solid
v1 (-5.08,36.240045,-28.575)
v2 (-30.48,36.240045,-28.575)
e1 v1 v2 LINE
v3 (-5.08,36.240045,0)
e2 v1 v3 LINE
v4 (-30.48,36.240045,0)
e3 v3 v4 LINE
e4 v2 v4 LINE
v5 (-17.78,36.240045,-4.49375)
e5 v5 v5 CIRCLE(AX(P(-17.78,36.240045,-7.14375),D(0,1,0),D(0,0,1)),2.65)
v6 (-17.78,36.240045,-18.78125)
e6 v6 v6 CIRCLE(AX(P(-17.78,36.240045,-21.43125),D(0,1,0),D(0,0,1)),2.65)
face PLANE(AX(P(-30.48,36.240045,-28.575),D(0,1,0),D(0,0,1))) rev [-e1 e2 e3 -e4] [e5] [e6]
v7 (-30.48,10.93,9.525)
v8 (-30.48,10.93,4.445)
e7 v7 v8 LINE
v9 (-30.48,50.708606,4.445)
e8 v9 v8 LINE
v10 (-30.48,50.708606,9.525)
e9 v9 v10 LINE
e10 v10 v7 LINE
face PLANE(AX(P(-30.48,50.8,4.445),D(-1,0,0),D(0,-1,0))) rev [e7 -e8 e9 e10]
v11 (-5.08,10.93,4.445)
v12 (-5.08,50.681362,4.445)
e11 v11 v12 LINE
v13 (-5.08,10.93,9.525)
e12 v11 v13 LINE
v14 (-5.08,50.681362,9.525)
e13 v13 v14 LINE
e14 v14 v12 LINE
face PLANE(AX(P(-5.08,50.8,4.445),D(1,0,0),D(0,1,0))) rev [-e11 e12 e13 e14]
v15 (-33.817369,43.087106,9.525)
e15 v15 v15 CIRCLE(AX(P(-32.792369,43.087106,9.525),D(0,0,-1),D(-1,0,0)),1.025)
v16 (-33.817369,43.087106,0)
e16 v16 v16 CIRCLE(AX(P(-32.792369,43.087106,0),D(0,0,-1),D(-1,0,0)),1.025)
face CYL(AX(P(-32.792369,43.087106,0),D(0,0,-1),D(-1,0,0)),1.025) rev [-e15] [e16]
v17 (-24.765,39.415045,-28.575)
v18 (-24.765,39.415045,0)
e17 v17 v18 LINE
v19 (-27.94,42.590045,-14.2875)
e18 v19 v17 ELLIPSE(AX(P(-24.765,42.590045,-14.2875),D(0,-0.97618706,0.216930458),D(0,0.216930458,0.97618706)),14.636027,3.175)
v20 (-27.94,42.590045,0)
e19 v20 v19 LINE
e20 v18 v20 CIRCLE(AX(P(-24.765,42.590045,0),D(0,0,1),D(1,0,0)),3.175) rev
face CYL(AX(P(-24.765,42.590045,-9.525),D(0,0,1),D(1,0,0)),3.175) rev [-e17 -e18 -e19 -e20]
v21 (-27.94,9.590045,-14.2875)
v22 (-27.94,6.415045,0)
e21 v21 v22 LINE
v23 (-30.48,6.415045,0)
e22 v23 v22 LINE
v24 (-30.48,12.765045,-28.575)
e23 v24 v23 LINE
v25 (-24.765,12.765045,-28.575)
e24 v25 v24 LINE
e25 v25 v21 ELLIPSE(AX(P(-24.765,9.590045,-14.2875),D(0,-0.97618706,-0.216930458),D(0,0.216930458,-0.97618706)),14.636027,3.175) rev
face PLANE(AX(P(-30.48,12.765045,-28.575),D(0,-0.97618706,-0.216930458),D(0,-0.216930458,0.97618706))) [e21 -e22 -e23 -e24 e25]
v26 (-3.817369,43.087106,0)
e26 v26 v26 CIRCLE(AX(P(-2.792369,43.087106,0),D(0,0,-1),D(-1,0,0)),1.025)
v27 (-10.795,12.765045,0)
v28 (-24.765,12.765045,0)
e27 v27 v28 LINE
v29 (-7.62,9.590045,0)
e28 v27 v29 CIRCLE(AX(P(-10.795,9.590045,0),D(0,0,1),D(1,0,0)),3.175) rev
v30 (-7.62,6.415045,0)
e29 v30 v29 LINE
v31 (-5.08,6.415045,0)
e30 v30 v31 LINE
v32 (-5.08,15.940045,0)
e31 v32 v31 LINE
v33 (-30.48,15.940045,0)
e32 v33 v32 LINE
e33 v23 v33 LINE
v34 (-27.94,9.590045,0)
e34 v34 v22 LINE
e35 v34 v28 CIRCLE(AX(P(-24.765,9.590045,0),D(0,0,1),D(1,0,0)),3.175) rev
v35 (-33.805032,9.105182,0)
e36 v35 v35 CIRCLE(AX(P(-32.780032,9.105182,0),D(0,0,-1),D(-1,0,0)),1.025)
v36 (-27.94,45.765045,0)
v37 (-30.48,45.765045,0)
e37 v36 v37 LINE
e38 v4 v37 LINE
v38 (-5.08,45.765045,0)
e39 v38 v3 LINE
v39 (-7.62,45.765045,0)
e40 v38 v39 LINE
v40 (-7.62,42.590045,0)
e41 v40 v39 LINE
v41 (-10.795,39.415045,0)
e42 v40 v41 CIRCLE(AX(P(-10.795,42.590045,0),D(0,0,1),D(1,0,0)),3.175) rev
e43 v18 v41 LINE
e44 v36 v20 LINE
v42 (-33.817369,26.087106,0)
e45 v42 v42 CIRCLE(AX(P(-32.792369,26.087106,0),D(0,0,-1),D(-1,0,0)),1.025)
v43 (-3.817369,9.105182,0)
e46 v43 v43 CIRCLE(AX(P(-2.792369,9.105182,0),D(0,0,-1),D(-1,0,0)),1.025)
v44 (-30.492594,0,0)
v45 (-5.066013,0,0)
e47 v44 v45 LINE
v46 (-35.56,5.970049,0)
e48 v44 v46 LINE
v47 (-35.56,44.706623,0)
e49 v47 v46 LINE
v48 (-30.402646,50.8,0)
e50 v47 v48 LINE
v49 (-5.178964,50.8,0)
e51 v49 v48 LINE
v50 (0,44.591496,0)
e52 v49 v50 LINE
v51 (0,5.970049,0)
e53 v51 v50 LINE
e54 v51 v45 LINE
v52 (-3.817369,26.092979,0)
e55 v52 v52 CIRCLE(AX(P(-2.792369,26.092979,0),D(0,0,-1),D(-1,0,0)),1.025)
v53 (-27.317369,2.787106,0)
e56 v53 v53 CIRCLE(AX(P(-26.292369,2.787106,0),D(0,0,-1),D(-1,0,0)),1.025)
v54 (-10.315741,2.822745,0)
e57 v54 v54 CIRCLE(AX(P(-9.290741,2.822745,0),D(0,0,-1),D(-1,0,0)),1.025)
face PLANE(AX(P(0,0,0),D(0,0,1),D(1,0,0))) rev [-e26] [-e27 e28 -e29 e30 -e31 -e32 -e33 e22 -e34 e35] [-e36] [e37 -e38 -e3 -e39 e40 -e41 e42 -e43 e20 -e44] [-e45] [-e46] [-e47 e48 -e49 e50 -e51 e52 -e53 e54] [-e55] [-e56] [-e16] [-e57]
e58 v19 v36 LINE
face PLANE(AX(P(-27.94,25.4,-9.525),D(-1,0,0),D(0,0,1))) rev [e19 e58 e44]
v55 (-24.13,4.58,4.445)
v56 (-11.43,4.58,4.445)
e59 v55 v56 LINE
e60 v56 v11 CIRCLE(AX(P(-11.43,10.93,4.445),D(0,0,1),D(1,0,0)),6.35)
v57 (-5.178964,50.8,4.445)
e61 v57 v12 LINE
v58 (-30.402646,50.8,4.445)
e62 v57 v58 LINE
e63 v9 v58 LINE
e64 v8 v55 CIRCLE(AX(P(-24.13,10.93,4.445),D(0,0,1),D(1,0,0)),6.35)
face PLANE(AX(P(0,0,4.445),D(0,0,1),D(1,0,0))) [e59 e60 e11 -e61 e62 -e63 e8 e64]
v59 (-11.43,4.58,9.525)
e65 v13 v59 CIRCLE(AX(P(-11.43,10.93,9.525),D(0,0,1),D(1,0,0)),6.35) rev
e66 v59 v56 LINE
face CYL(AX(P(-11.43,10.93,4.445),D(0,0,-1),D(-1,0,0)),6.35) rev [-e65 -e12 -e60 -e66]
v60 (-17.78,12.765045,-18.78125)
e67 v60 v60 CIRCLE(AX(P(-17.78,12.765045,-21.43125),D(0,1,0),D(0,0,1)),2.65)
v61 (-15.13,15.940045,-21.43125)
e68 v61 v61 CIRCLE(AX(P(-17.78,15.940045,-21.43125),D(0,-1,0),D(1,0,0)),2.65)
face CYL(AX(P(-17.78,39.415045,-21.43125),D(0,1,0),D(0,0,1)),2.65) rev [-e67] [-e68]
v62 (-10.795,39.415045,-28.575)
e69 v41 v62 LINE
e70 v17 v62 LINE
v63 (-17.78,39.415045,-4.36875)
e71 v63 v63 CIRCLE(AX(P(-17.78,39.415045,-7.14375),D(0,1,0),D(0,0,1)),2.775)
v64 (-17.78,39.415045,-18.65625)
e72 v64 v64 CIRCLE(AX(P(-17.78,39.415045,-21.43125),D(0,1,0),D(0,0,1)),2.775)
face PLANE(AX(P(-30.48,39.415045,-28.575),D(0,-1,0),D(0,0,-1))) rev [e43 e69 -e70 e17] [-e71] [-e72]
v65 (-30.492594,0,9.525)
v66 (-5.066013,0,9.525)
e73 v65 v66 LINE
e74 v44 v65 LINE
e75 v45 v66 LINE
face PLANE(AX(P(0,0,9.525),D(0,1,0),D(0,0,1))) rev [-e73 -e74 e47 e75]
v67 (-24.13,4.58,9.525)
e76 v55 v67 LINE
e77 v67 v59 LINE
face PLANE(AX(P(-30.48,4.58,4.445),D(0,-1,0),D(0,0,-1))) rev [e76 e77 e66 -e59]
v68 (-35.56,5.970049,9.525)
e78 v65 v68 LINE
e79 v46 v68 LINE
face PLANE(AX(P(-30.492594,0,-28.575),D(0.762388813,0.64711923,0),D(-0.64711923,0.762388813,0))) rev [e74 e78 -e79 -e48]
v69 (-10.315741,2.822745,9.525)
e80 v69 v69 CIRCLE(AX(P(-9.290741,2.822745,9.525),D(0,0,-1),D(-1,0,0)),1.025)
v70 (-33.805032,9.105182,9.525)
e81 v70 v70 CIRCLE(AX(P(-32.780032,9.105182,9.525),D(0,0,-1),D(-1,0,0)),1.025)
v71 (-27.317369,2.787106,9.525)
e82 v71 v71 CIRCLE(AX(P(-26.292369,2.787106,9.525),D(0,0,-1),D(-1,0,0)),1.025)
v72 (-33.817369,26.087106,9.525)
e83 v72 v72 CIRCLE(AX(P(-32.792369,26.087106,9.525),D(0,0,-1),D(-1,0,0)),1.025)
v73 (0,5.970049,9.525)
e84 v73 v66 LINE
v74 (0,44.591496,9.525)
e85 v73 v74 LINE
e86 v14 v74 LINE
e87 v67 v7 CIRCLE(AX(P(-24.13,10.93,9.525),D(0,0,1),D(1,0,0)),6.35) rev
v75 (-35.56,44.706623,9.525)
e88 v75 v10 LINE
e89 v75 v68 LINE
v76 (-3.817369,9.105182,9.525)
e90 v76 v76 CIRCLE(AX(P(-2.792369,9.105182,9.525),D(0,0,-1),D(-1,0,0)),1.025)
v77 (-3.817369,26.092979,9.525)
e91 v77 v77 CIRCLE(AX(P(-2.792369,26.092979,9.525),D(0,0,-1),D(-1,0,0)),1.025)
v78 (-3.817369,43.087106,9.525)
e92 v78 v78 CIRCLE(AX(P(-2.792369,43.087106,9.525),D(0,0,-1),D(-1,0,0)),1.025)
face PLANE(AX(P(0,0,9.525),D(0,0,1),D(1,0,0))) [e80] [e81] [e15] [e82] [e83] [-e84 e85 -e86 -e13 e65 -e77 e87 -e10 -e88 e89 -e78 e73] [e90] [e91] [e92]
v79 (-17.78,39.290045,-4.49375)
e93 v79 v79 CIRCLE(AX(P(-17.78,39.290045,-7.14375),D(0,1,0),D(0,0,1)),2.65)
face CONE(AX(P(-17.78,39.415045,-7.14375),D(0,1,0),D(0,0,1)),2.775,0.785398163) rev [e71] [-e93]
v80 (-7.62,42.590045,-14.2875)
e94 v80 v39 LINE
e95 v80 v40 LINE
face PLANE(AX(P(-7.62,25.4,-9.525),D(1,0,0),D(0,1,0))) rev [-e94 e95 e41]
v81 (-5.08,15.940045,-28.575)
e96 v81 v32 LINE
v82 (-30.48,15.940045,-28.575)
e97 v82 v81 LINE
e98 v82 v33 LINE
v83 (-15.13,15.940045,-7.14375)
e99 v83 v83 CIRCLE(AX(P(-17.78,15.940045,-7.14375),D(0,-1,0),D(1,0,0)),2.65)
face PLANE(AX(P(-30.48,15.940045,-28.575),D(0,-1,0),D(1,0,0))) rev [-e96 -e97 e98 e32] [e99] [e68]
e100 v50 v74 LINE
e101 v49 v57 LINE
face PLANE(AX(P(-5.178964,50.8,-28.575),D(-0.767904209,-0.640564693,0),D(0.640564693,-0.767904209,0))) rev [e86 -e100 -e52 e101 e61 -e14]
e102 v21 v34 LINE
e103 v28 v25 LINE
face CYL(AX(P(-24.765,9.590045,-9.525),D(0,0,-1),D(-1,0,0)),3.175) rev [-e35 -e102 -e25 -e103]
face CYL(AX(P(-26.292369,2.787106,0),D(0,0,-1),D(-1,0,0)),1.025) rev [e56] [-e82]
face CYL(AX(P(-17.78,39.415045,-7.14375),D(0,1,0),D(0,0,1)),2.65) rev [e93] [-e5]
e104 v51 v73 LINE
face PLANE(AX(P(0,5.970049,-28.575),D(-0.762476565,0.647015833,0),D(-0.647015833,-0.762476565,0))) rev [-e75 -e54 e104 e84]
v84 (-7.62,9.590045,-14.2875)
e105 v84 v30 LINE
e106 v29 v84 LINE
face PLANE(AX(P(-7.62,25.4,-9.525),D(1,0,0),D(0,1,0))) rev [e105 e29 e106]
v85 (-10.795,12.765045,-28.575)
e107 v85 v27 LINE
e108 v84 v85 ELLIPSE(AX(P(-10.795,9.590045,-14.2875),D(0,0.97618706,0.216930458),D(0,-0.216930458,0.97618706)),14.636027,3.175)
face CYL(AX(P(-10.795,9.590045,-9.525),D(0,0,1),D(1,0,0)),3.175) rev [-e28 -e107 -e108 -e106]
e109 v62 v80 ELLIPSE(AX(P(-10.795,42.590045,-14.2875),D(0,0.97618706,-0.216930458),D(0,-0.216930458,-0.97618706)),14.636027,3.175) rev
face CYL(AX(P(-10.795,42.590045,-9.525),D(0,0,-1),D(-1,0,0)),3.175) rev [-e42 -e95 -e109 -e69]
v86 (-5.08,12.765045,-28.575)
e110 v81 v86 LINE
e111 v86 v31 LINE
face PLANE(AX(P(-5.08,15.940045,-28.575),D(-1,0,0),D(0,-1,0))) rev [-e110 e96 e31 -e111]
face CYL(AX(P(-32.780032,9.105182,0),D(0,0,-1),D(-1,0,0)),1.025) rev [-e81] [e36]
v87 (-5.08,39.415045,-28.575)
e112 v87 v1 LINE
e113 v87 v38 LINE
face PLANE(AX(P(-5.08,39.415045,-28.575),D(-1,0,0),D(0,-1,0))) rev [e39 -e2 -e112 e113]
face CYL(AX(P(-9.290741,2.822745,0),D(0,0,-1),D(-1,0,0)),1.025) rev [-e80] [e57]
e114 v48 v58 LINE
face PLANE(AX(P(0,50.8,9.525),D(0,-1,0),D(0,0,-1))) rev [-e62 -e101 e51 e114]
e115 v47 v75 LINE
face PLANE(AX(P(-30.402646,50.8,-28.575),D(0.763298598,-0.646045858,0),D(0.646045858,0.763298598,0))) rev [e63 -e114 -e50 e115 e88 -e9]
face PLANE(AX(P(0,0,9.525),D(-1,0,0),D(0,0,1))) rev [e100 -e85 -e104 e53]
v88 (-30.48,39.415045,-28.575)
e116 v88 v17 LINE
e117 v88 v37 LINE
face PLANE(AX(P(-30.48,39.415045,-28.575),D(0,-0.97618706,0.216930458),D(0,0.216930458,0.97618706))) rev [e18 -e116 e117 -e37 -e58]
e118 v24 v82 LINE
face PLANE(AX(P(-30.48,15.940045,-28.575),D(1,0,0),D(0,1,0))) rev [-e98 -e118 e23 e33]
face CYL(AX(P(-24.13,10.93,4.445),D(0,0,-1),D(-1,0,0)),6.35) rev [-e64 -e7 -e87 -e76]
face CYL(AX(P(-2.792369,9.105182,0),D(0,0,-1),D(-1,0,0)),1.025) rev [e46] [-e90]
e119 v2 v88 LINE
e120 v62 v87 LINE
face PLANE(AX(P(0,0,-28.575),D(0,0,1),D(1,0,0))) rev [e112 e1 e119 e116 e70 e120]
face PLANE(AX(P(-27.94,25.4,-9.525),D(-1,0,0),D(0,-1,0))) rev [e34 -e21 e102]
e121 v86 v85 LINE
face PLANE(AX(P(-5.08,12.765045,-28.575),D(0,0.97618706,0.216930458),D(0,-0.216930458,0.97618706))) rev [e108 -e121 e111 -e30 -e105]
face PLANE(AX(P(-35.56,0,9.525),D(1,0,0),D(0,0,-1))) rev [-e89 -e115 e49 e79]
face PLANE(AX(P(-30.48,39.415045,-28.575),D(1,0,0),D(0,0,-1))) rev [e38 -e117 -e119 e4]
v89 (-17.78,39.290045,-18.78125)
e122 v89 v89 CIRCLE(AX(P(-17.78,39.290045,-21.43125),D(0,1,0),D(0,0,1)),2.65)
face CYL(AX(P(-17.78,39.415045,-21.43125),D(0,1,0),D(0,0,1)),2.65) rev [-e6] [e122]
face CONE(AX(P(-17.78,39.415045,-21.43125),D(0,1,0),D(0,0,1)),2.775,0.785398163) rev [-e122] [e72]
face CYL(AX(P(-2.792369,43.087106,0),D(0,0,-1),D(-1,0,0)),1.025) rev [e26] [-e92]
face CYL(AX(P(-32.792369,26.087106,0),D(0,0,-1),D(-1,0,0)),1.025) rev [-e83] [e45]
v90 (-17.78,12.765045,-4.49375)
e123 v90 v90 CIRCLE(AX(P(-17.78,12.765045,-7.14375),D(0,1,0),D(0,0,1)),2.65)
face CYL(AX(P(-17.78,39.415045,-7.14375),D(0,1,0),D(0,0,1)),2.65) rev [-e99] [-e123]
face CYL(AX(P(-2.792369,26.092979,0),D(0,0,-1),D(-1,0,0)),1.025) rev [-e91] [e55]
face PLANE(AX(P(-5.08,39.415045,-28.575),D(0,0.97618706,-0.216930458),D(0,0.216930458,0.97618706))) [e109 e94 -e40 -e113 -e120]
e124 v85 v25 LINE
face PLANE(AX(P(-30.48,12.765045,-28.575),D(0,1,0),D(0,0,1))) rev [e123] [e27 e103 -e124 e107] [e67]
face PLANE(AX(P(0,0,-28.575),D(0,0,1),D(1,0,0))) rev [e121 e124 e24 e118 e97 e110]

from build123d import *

# Parameters (mm, degrees)
SKETCH1_W                      = 35.56
SKETCH1_H                      = 50.8
BOSS_EXTRUDE1_DEPTH            = 9.525
SKETCH2_W                      = 25.4
SKETCH2_H                      = 46.22
CUT_EXTRUDE2_DEPTH             = 5.08
TAP_DRILL_FOR_M2_5X0_45_TAP1_D = 2.05
SKETCH13_W                     = 25.4
SKETCH13_H                     = 3.175
BOSS_EXTRUDE2_DEPTH            = 28.575
CUT_EXTRUDE3_DEPTH             = 73.778867812
FILLET1_R                      = 6.35
M5_CLEARANCE_HOLE1_D           = 5.3
M5_CLEARANCE_HOLE1_CSINK_D     = 5.55
M5_CLEARANCE_HOLE1_CSINK_ANGLE = 90
RIB7_REACH                     = 67.774
SKETCH14_WALL_W                = 162.819779212
SKETCH14_WALL_H                = 2.54
RIB8_REACH                     = 67.774
SKETCH15_WALL_W                = 162.819779212
SKETCH15_WALL_H                = 2.54
RIB9_REACH                     = 67.774
SKETCH17_WALL_W                = 162.819779212
SKETCH17_WALL_H                = 2.54
RIB10_REACH                    = 67.774
SKETCH16_WALL_W                = 162.819779212
SKETCH16_WALL_H                = 2.54
FILLET2_R                      = 3.175
FILLET3_R                      = 3.175


with BuildPart() as part:
    # Sketch1 → Boss-Extrude1 (new body)
    with BuildSketch(Plane.XY):
        with Locations((-17.78, 25.4)):
            Rectangle(SKETCH1_W, SKETCH1_H)
    extrude(amount=BOSS_EXTRUDE1_DEPTH)

    # Sketch2 → Cut-Extrude2 (cut)
    with BuildSketch(Plane.XY.offset(9.525)):
        with Locations((-17.78, 27.69)):
            Rectangle(SKETCH2_W, SKETCH2_H)
    extrude(amount=-CUT_EXTRUDE2_DEPTH, mode=Mode.SUBTRACT)

    # Tap Drill for M2.5x0.45 Tap1 (through all)
    with Locations(Plane(origin=(0, 0, 0), x_dir=(-1, 0, 0), z_dir=(0, 0, -1))):
        with Locations((2.792369004, 43.087106138), (2.792369004, 26.092979092), (2.792369004, 9.105182099), (9.290740849, 2.822744672), (26.292369004, 2.787106138), (32.780032006, 9.105182099), (32.792369004, 26.087106138), (32.792369004, 43.087106138)):
            Hole(TAP_DRILL_FOR_M2_5X0_45_TAP1_D / 2)

    # Sketch13 → Boss-Extrude2 (add)
    with BuildSketch(Plane(origin=(0, 0, 0), x_dir=(-1, 0, 0), z_dir=(0, 0, -1))):
        with Locations((17.78, 37.827545037)):
            Rectangle(SKETCH13_W, SKETCH13_H)
        with Locations((17.78, 14.352545037)):
            Rectangle(SKETCH13_W, SKETCH13_H)
    extrude(amount=BOSS_EXTRUDE2_DEPTH)

    # Sketch8 → Cut-Extrude3 (cut, through all)
    with BuildSketch(Plane.XY.offset(9.525)):
        Polygon((-5.178964387, 50.8), (0, 44.591495864), (0, 50.8), align=None)
        Polygon((-35.56, 44.706622517), (-35.56, 50.8), (-30.402645731, 50.8), align=None)
        Polygon((-35.56, 5.970049098), (-35.56, 0), (-30.492594088, 0), align=None)
        Polygon((-5.092594088, -0.031324356), (0, 0), (0, 5.970049098), align=None)
    extrude(amount=-CUT_EXTRUDE3_DEPTH, mode=Mode.SUBTRACT)

    # Fillet1
    fillet1_edges = [part.edges().sort_by_distance(p)[0] for p in [
        (-5.08, 4.58, 6.985),
        (-30.48, 4.58, 6.985),
    ]]
    fillet(fillet1_edges, radius=FILLET1_R)

    # M5 Clearance Hole1 (through all)
    with Locations(Plane(origin=(-17.78, 39.415045037, -7.14375), x_dir=(0, 0, 1), z_dir=(0, 1, 0))):
        with Locations((0, 0), (-14.2875, 0)):
            CounterSinkHole(M5_CLEARANCE_HOLE1_D / 2, M5_CLEARANCE_HOLE1_CSINK_D / 2, counter_sink_angle=M5_CLEARANCE_HOLE1_CSINK_ANGLE)

    # Sketch14 wall → Rib7 (add, up to next)
    with BuildSketch(Plane(origin=(-30.48, 9.590045037, -14.2875), x_dir=(0, -0.216930457819, 0.976187060184), z_dir=(0, 0.976187060184, 0.216930457819)), mode=Mode.PRIVATE) as rib7_sk1:
        with Locations((0, 1.27)):
            Rectangle(SKETCH14_WALL_W, SKETCH14_WALL_H)
    rib7_tool1 = extrude(rib7_sk1.sketch, amount=RIB7_REACH, mode=Mode.PRIVATE) - part.part
    add(rib7_tool1.solids().sort_by_distance((-30.48, 9.590045037, -14.2875))[0])

    # Sketch15 wall → Rib8 (add, up to next)
    with BuildSketch(Plane(origin=(-5.08, 9.590045037, -14.2875), x_dir=(0, -0.216930457819, 0.976187060184), z_dir=(0, -0.976187060184, -0.216930457819)), mode=Mode.PRIVATE) as rib8_sk1:
        with Locations((0, 1.27)):
            Rectangle(SKETCH15_WALL_W, SKETCH15_WALL_H)
    rib8_tool1 = extrude(rib8_sk1.sketch, amount=-RIB8_REACH, mode=Mode.PRIVATE) - part.part
    add(rib8_tool1.solids().sort_by_distance((-5.08, 9.590045037, -14.2875))[0])

    # Sketch17 wall → Rib9 (add, up to next)
    with BuildSketch(Plane(origin=(-5.08, 42.590045037, -14.2875), x_dir=(0, 0.216930457819, 0.976187060184), z_dir=(0, -0.976187060184, 0.216930457819)), mode=Mode.PRIVATE) as rib9_sk1:
        with Locations((0, 1.27)):
            Rectangle(SKETCH17_WALL_W, SKETCH17_WALL_H)
    rib9_tool1 = extrude(rib9_sk1.sketch, amount=RIB9_REACH, mode=Mode.PRIVATE) - part.part
    add(rib9_tool1.solids().sort_by_distance((-5.08, 42.590045037, -14.2875))[0])

    # Sketch16 wall → Rib10 (add, up to next)
    with BuildSketch(Plane(origin=(-30.48, 42.590045037, -14.2875), x_dir=(0, 0.216930457819, 0.976187060184), z_dir=(0, 0.976187060184, -0.216930457819)), mode=Mode.PRIVATE) as rib10_sk1:
        with Locations((0, 1.27)):
            Rectangle(SKETCH16_WALL_W, SKETCH16_WALL_H)
    rib10_tool1 = extrude(rib10_sk1.sketch, amount=-RIB10_REACH, mode=Mode.PRIVATE) - part.part
    add(rib10_tool1.solids().sort_by_distance((-30.48, 42.590045037, -14.2875))[0])

    # Fillet2
    fillet2_edges = [part.edges().sort_by_distance(p)[0] for p in [
        (-27.94, 12.765045037, -14.2875),
        (-7.62, 12.765045037, -14.2875),
    ]]
    fillet(fillet2_edges, radius=FILLET2_R)

    # Fillet3
    fillet3_edges = [part.edges().sort_by_distance(p)[0] for p in [
        (-7.62, 39.415045037, -14.2875),
        (-27.94, 39.415045037, -14.2875),
    ]]
    fillet(fillet3_edges, radius=FILLET3_R)


solid = part.part
